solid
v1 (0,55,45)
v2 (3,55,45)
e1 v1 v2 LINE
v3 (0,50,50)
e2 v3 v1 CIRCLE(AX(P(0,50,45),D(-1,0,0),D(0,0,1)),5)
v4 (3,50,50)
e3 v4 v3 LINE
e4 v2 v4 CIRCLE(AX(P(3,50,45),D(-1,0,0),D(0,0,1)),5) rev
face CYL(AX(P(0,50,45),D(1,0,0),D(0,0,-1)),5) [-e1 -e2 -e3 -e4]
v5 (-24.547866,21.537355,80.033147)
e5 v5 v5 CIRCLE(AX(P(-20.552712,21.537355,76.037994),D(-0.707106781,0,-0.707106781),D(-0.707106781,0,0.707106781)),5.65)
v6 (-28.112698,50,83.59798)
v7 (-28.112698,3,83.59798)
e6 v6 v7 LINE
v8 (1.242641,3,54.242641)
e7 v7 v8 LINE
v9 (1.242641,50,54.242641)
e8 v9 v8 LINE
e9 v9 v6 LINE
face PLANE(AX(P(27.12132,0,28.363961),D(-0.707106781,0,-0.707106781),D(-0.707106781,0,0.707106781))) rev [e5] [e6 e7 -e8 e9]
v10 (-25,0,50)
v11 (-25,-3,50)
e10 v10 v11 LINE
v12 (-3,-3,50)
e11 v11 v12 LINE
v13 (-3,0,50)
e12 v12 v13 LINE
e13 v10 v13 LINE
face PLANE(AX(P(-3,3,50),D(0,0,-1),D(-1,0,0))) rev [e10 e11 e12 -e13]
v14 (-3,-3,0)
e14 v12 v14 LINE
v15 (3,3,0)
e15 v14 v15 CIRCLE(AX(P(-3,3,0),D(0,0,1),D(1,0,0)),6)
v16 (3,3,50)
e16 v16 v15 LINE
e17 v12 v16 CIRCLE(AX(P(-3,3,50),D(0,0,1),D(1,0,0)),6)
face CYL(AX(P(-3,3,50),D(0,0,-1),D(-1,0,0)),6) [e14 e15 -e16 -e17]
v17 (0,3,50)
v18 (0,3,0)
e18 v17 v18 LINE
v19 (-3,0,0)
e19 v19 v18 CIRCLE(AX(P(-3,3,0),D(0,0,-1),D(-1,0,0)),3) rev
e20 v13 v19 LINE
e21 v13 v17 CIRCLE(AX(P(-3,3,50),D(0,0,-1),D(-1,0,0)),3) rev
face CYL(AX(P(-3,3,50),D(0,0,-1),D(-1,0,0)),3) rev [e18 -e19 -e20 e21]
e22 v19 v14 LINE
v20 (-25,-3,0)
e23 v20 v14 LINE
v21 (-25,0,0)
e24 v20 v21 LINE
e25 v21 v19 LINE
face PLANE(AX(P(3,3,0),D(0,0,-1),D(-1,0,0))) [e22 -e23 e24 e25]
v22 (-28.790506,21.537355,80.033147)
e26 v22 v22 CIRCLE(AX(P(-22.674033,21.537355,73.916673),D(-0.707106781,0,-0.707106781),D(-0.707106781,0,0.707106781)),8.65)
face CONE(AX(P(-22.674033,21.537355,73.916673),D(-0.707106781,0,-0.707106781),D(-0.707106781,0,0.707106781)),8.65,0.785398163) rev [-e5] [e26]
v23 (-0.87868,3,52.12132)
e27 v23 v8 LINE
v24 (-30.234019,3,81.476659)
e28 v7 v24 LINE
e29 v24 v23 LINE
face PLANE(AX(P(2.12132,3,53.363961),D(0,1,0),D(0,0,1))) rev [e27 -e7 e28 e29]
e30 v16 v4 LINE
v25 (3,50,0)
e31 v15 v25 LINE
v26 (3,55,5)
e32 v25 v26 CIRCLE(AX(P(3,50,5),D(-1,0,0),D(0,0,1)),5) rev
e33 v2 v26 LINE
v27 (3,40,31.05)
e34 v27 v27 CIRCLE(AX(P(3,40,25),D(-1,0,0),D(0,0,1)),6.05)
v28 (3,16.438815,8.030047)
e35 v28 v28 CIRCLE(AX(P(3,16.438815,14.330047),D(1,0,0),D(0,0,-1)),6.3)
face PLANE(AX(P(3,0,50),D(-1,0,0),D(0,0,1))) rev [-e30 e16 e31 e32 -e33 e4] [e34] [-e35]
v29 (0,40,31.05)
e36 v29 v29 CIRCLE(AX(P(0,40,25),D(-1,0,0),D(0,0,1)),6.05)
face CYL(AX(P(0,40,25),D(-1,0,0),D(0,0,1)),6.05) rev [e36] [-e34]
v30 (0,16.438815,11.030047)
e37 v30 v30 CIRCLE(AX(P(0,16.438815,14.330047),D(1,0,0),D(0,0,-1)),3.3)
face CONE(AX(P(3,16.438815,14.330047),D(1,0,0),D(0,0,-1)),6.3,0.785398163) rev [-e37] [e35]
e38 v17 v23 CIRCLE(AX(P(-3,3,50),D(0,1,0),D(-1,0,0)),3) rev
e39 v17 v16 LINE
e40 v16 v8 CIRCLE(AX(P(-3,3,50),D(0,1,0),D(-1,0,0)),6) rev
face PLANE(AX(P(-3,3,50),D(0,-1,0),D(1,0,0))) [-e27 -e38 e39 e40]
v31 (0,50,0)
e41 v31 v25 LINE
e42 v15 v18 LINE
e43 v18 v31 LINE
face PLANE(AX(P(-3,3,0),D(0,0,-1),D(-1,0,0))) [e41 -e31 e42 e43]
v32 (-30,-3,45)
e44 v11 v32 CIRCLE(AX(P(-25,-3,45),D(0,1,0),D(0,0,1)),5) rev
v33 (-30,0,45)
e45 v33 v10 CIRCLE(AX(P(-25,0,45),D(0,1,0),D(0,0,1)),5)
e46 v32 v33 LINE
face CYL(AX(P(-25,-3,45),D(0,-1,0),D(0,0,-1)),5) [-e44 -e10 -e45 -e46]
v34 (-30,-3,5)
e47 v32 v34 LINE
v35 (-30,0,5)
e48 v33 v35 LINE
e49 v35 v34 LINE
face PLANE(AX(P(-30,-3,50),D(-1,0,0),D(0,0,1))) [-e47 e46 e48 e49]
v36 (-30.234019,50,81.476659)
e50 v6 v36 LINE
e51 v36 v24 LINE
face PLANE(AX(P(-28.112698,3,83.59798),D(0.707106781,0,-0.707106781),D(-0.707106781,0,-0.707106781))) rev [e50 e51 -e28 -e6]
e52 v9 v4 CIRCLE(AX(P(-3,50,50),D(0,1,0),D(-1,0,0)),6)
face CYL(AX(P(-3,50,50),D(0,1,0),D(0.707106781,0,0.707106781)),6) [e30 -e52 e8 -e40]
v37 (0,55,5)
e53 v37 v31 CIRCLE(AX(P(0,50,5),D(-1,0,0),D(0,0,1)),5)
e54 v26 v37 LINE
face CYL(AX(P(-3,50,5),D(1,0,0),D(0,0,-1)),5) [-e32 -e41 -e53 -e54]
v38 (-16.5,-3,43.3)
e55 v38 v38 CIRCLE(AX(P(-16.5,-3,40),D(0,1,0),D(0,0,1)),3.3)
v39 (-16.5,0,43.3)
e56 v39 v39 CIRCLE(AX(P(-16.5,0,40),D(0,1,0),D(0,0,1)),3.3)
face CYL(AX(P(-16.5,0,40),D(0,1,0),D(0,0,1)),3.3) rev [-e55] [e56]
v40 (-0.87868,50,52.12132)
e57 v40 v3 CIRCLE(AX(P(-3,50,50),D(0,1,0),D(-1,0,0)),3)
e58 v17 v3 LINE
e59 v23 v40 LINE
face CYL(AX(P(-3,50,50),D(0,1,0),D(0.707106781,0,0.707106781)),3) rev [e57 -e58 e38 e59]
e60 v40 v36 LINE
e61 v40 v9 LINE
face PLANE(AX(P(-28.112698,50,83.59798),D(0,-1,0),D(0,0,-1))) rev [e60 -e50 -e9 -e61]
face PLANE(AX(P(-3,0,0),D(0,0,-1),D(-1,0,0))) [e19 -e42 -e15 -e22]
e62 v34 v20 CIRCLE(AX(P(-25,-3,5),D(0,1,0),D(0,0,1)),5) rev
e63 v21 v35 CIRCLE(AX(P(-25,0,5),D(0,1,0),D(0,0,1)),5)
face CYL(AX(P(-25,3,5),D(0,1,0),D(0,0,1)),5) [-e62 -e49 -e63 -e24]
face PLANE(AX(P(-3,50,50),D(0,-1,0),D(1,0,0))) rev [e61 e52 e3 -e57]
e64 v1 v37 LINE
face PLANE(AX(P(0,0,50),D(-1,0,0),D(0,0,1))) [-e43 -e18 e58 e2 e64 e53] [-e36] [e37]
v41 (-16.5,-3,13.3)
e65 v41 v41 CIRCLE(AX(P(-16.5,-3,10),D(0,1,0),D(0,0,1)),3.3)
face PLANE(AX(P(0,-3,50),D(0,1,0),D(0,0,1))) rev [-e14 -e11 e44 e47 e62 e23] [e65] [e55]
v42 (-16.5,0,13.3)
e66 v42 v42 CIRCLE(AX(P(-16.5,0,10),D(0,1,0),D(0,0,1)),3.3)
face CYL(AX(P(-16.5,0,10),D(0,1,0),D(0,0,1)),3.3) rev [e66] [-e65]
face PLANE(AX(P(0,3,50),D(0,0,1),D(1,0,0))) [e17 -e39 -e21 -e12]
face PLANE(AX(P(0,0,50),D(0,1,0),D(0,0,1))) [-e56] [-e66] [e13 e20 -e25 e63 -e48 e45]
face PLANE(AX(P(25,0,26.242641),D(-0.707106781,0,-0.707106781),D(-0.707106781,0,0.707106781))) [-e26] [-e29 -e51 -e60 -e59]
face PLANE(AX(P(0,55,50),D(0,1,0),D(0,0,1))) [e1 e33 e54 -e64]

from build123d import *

# Parameters (mm, degrees)
BASE_FLANGE1_DEPTH                                  = 50
M12_CLEARANCE_HOLE1_D                               = 12.1
M6_CLEARANCE_HOLE1_D                                = 6.6
BREAK_CORNER1_START                                 = -3
BREAK_CORNER1_DEPTH                                 = 3
BREAK_CORNER1_2_DEPTH                               = 3
EDGE_FLANGE2_DEPTH                                  = 47
CSK_FOR_M8_COUNTERSUNK_FLAT_HEAD_SCREW1_D           = 9
CSK_FOR_M8_COUNTERSUNK_FLAT_HEAD_SCREW1_CSINK_D     = 17.3
CSK_FOR_M8_COUNTERSUNK_FLAT_HEAD_SCREW1_CSINK_ANGLE = 90
CSK_FOR_M6_COUNTERSUNK_FLAT_HEAD_SCREW1_D           = 6.6
CSK_FOR_M6_COUNTERSUNK_FLAT_HEAD_SCREW1_CSINK_D     = 12.6
CSK_FOR_M6_COUNTERSUNK_FLAT_HEAD_SCREW1_CSINK_ANGLE = 90


# Read off the part's stored shape, not the designer's step: Break-Corner1
# Sheet-metal steps are written as plain solids
with BuildPart() as part:
    # Sketch1 → Base-Flange1 (new body)
    with BuildSketch(Plane.XY):
        with BuildLine():
            Line((0, 55), (0, 3))
            ThreePointArc((0, 3), (-0.878679656, 0.878679656), (-3, 0))
            Line((-3, 0), (-30, 0))
            Line((-30, 0), (-30, -3))
            Line((-30, -3), (-3, -3))
            ThreePointArc((-3, -3), (1.242640687, -1.242640687), (3, 3))
            Line((3, 3), (3, 55))
            Line((3, 55), (0, 55))
        make_face()
    extrude(amount=BASE_FLANGE1_DEPTH)

    # M12 Clearance Hole1 (through all)
    with Locations(Plane.ZY):
        with Locations((25, 40)):
            Hole(M12_CLEARANCE_HOLE1_D / 2)

    # M6 Clearance Hole1 (through all)
    with Locations(Plane(origin=(0, 0, 0), x_dir=(1, 0, 0), z_dir=(0, 1, 0))):
        with Locations((-16.5, -40), (-16.5, -10)):
            Hole(M6_CLEARANCE_HOLE1_D / 2)

    # Break-Corner1 outline → Break-Corner1 (cut)
    with BuildSketch(Plane(origin=(0, 0, 0), x_dir=(1, 0, 0), z_dir=(0, 1, 0)).offset(BREAK_CORNER1_START)):
        with BuildLine():
            Line((-30, -50), (-25, -50))
            ThreePointArc((-25, -50), (-28.535533906, -48.535533906), (-30, -45))
            Line((-30, -45), (-30, -50))
        make_face()
        with BuildLine():
            Line((-30, 0), (-30, -5))
            ThreePointArc((-30, -5), (-28.535533906, -1.464466094), (-25, 0))
            Line((-25, 0), (-30, 0))
        make_face()
    extrude(amount=BREAK_CORNER1_DEPTH, mode=Mode.SUBTRACT)

    # Break-Corner1 2 outline → Break-Corner1 2 (cut)
    with BuildSketch(Plane.YZ):
        with BuildLine():
            Line((55, 0), (55, 5))
            ThreePointArc((55, 5), (53.535533906, 1.464466094), (50, 0))
            Line((50, 0), (55, 0))
        make_face()
        with BuildLine():
            ThreePointArc((50, 50), (53.535533906, 48.535533906), (55, 45))
            Line((55, 45), (55, 50))
            Line((55, 50), (50, 50))
        make_face()
    extrude(amount=BREAK_CORNER1_2_DEPTH, mode=Mode.SUBTRACT)

    # Edge-Flange2 section (across the edge) → Edge-Flange2 (add)
    with BuildSketch(Plane(origin=(0, 3, 51.242640687), x_dir=(-0.7071067811865512, 0, -0.7071067811865438), z_dir=(0, 1, 0))):
        with BuildLine():
            Line((-3, 1.242640687), (-3, 42.757359313))
            Line((-3, 42.757359313), (0, 42.757359313))
            Line((0, 42.757359313), (0, 1.242640687))
            ThreePointArc((0, 1.242640687), (0.228361402, 0.09459039), (0.878679656, -0.878679656))
            Line((0.878679656, -0.878679656), (-1.242640687, -3))
            ThreePointArc((-1.242640687, -3), (-2.543277195, -1.053459907), (-3, 1.242640687))
        make_face()
    extrude(amount=EDGE_FLANGE2_DEPTH)

    # CSK for M8 Countersunk Flat Head Screw1 (through all)
    with Locations(Plane(origin=(25.621320344, 0, 25.621320344), x_dir=(-0.7071067811865437, 0, 0.7071067811865513), z_dir=(-0.7071067811865513, 0, -0.7071067811865437))):
        with Locations((68.299943249, 21.537354557)):
            CounterSinkHole(CSK_FOR_M8_COUNTERSUNK_FLAT_HEAD_SCREW1_D / 2, CSK_FOR_M8_COUNTERSUNK_FLAT_HEAD_SCREW1_CSINK_D / 2, counter_sink_angle=CSK_FOR_M8_COUNTERSUNK_FLAT_HEAD_SCREW1_CSINK_ANGLE)

    # CSK for M6 Countersunk Flat Head Screw1 (through all)
    with Locations(Plane(origin=(3, 0, 0), x_dir=(0, 0, -1), z_dir=(1, 0, 0))):
        with Locations((-14.330047328, 16.438814783)):
            CounterSinkHole(CSK_FOR_M6_COUNTERSUNK_FLAT_HEAD_SCREW1_D / 2, CSK_FOR_M6_COUNTERSUNK_FLAT_HEAD_SCREW1_CSINK_D / 2, counter_sink_angle=CSK_FOR_M6_COUNTERSUNK_FLAT_HEAD_SCREW1_CSINK_ANGLE)


solid = part.part
